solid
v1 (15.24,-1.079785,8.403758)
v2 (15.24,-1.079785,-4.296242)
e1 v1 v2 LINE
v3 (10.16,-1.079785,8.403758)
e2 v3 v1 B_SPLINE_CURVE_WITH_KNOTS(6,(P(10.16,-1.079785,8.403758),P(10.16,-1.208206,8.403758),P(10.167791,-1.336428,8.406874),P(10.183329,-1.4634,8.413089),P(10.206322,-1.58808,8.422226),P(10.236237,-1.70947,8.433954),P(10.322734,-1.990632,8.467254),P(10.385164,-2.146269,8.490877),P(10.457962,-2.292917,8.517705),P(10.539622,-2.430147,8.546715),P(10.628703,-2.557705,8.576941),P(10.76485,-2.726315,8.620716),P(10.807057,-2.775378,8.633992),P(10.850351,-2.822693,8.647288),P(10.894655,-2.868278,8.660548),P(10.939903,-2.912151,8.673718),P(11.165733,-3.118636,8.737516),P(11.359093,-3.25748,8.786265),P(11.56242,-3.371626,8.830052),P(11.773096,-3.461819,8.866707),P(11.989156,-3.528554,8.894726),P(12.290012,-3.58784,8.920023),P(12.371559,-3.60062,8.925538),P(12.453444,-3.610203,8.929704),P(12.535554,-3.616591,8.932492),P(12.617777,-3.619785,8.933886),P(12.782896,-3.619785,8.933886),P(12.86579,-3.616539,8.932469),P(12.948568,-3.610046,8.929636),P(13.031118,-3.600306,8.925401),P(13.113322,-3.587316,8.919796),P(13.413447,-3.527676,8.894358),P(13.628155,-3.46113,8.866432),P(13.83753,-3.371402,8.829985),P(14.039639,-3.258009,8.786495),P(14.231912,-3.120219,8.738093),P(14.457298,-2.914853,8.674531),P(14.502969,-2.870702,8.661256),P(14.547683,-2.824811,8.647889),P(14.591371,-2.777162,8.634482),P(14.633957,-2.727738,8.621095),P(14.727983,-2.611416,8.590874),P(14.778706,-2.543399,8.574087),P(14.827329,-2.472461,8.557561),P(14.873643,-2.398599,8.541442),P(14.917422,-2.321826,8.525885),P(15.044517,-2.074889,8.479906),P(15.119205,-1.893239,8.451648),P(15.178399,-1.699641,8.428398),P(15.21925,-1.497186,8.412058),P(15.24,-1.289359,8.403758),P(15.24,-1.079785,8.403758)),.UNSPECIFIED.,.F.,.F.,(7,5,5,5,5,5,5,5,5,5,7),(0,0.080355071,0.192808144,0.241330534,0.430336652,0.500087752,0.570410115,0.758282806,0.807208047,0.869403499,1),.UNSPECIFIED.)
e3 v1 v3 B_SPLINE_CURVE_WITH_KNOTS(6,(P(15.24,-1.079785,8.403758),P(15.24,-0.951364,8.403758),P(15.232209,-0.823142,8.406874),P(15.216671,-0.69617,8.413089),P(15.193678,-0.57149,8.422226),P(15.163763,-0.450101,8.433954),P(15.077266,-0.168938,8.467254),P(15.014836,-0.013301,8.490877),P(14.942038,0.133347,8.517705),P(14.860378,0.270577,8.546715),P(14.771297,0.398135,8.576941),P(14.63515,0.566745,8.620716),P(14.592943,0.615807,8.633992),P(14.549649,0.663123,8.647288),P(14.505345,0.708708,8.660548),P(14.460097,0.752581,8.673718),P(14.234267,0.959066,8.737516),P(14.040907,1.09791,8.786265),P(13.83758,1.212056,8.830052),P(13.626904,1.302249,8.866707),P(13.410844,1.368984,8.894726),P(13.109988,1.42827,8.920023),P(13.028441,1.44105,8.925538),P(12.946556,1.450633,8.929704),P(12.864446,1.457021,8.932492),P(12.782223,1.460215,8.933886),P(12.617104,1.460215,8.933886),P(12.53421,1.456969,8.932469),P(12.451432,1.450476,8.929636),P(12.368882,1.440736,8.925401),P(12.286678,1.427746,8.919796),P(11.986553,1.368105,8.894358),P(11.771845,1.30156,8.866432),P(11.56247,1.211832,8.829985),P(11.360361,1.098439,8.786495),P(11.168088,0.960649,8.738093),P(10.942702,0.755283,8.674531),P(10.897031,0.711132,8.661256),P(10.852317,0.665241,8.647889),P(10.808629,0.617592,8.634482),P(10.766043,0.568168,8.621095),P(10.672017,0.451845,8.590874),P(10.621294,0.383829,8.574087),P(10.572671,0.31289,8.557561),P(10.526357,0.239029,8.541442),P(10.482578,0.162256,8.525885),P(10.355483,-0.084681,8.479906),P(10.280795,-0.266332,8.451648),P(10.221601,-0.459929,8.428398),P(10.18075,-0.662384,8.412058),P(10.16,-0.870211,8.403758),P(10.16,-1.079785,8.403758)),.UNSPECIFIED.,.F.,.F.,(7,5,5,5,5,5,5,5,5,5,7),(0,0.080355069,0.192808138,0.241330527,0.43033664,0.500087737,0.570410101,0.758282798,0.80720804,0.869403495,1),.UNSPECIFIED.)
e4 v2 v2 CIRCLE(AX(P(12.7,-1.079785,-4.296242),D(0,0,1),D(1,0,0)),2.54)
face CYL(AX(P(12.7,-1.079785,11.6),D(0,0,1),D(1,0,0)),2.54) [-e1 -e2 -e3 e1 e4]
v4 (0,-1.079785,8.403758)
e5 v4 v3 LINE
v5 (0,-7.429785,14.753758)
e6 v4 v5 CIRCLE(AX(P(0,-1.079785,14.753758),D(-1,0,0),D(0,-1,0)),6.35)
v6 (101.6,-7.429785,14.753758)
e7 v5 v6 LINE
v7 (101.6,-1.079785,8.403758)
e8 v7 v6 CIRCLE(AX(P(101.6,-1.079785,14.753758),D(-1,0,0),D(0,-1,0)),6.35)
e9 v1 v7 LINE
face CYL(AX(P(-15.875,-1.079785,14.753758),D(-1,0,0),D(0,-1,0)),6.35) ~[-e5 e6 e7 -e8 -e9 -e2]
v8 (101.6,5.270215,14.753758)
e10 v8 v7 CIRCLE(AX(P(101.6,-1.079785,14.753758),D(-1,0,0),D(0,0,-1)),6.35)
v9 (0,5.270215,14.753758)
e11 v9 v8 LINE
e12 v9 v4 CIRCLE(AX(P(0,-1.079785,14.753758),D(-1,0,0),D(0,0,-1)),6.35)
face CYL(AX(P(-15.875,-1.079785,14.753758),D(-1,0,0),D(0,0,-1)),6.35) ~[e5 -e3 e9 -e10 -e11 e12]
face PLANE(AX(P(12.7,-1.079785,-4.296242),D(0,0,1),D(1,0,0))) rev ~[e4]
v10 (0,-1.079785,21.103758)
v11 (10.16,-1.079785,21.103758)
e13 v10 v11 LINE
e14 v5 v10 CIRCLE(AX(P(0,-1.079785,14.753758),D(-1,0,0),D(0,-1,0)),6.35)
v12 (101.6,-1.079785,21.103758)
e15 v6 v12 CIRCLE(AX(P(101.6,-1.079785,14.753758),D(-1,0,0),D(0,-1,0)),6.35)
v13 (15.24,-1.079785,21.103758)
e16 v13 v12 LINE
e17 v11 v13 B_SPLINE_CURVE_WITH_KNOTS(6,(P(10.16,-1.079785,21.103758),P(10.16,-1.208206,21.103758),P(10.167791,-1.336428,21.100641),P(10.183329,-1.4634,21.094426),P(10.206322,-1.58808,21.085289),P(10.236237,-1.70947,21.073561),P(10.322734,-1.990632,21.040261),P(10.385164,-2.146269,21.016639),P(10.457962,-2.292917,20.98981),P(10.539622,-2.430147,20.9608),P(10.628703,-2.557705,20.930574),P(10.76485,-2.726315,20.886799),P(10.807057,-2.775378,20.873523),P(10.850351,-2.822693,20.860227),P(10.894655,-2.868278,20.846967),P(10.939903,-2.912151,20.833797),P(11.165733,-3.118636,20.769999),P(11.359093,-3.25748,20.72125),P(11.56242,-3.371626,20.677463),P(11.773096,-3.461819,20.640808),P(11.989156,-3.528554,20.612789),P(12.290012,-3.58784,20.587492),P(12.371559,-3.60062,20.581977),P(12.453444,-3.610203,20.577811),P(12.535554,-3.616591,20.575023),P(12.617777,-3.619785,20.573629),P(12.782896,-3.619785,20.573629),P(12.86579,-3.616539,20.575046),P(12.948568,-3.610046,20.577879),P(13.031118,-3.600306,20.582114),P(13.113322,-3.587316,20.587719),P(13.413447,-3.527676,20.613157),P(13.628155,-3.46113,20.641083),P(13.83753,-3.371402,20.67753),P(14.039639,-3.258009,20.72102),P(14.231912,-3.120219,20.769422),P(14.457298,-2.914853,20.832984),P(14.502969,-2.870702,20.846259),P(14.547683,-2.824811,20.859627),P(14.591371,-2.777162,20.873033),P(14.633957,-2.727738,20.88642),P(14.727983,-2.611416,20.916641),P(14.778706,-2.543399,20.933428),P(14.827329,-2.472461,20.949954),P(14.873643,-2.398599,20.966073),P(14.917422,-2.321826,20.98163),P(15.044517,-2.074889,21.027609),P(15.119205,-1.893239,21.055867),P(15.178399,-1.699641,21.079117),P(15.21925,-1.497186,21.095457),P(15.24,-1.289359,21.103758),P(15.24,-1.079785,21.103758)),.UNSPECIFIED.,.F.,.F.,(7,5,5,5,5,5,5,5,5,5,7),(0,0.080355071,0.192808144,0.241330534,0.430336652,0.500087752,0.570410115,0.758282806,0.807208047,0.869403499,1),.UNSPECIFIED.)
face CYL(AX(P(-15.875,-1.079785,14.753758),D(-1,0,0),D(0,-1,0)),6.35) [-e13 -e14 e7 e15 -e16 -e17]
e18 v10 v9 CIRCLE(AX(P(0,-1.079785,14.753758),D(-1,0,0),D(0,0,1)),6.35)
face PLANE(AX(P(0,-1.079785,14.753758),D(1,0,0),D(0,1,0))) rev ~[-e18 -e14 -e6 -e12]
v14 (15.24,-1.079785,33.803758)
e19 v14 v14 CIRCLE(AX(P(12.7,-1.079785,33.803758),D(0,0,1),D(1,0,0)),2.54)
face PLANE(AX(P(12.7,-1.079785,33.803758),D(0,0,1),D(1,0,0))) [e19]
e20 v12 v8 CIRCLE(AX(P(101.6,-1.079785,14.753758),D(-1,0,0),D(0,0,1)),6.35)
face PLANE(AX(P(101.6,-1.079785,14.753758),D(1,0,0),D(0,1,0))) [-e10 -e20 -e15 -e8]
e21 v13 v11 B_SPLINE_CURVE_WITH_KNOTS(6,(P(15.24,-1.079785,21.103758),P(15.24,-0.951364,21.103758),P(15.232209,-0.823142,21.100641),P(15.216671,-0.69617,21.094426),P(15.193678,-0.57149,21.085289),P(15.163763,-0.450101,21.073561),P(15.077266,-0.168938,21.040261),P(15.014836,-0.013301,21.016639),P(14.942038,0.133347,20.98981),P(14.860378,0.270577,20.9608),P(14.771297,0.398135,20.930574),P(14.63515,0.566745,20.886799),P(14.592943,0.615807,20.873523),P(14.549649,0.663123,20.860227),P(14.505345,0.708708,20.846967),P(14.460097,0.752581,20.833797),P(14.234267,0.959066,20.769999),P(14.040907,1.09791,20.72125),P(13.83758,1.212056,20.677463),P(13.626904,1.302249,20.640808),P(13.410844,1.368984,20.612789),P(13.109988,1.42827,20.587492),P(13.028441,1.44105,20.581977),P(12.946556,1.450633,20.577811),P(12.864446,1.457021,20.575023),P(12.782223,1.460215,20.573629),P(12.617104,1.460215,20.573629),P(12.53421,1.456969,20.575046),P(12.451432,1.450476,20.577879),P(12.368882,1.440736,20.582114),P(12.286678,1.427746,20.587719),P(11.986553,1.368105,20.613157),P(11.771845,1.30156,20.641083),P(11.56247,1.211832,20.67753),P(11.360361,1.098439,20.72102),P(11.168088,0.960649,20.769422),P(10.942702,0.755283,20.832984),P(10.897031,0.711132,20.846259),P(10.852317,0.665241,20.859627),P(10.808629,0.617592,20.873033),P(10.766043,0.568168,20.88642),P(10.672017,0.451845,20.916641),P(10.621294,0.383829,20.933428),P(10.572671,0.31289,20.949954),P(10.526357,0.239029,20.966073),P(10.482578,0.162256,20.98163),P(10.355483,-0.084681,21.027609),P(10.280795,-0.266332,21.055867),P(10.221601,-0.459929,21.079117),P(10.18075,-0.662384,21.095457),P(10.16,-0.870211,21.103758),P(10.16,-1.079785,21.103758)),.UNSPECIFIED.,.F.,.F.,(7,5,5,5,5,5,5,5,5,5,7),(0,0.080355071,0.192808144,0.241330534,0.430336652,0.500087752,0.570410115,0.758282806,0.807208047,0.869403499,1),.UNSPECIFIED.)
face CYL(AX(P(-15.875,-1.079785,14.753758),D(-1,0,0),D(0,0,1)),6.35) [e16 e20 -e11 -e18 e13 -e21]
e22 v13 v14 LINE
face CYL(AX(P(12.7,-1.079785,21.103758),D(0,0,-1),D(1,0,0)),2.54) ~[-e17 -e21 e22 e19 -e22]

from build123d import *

# Parameters (mm, degrees)
F0_W         = 12.7
F0_H         = 12.7
F1_DEPTH     = 101.6
F2_R         = 2.54
F3_DEPTH     = 25.4
F4_DEPTH     = 12.7
F5_T4_DEPTH  = 133.35
F5_S5_R      = 2.54
F5_T6_DEPTH  = 68
F5_T10_DEPTH = 133.35
F5_S11_R     = 2.54
F5_T12_DEPTH = 68
F5_T16_DEPTH = 133.35
F5_S17_R     = 2.54
F5_T18_DEPTH = 68
F5_T22_DEPTH = 133.35
F5_S23_R     = 2.54
F5_T24_DEPTH = 68


# Not quite as in the source:
# - a fillet or chamfer that OpenCascade refuses, or shapes differently, is made with other operations: its cross-section is extruded or revolved along the edge and cut away or added


with BuildPart() as f1:
    # F0 (on Right) → F1 (new body)
    with BuildSketch(Plane.YZ):
        with Locations((-1.0797850298, 14.7537575103)):
            Rectangle(F0_W, F0_H)
    extrude(amount=F1_DEPTH)

    # F2 (on face) → F3 (join)
    with BuildSketch(Plane.XY.offset(21.1037575103)):
        with Locations((12.7, -1.0797850298)):
            Circle(F2_R)
    extrude(amount=-F3_DEPTH)

    # F2 (on face) → F4 (join)
    with BuildSketch(Plane.XY.offset(21.1037575103)):
        with Locations((12.7, -1.0797850298)):
            Circle(F2_R)
    extrude(amount=F4_DEPTH)

    # F5: fillet of radius 6.35 on 4 edges, made by hand


with BuildPart() as f5_tool2:
    # F5_s3 → F5_t4 (new body)
    with BuildSketch(Plane.YZ.offset(-15.875)):
        with BuildLine():
            ThreePointArc((-7.4297850298, 14.7537575103), (-5.5699130903, 19.2438855709), (-1.0797850298, 21.1037575103))
            Line((-1.0797850298, 21.1037575103), (-7.4297850298, 21.1037575103))
            Line((-7.4297850298, 21.1037575103), (-7.4297850298, 14.7537575103))
        make_face()
    extrude(amount=F5_T4_DEPTH)

    # F5_s5 → F5_t6 (cut, symmetric)
    with BuildSketch(Plane.XY.offset(17.9)):
        with Locations((12.7, -1.0797850298)):
            Circle(F5_S5_R)
    extrude(amount=F5_T6_DEPTH, both=True, mode=Mode.SUBTRACT)


with BuildPart() as f1_1:
    add(f1.part)

    # F5_t1: cut F5_tool2
    add(f5_tool2.part, mode=Mode.SUBTRACT)


with BuildPart() as f5_tool8:
    # F5_s9 → F5_t10 (new body)
    with BuildSketch(Plane.YZ.offset(-15.875)):
        with BuildLine():
            ThreePointArc((-1.0797850298, 21.1037575103), (3.4103430308, 19.2438855709), (5.2702149702, 14.7537575103))
            Line((5.2702149702, 14.7537575103), (5.2702149702, 21.1037575103))
            Line((5.2702149702, 21.1037575103), (-1.0797850298, 21.1037575103))
        make_face()
    extrude(amount=F5_T10_DEPTH)

    # F5_s11 → F5_t12 (cut, symmetric)
    with BuildSketch(Plane.XY.offset(17.9)):
        with Locations((12.7, -1.0797850298)):
            Circle(F5_S11_R)
    extrude(amount=F5_T12_DEPTH, both=True, mode=Mode.SUBTRACT)


with BuildPart() as f1_2:
    add(f1_1.part)

    # F5_t7: cut F5_tool8
    add(f5_tool8.part, mode=Mode.SUBTRACT)


with BuildPart() as f5_tool14:
    # F5_s15 → F5_t16 (new body)
    with BuildSketch(Plane.YZ.offset(-15.875)):
        with BuildLine():
            ThreePointArc((-7.4297850298, 14.7537575103), (-5.5699130903, 10.2636294498), (-1.0797850298, 8.4037575103))
            Line((-1.0797850298, 8.4037575103), (-7.4297850298, 8.4037575103))
            Line((-7.4297850298, 8.4037575103), (-7.4297850298, 14.7537575103))
        make_face()
    extrude(amount=F5_T16_DEPTH)

    # F5_s17 → F5_t18 (cut, symmetric)
    with BuildSketch(Plane.XY.offset(11.6)):
        with Locations((12.7, -1.0797850298)):
            Circle(F5_S17_R)
    extrude(amount=F5_T18_DEPTH, both=True, mode=Mode.SUBTRACT)


with BuildPart() as f1_3:
    add(f1_2.part)

    # F5_t13: cut F5_tool14
    add(f5_tool14.part, mode=Mode.SUBTRACT)


with BuildPart() as f5_tool20:
    # F5_s21 → F5_t22 (new body)
    with BuildSketch(Plane.YZ.offset(-15.875)):
        with BuildLine():
            ThreePointArc((-1.0797850298, 8.4037575103), (3.4103430308, 10.2636294498), (5.2702149702, 14.7537575103))
            Line((5.2702149702, 14.7537575103), (5.2702149702, 8.4037575103))
            Line((5.2702149702, 8.4037575103), (-1.0797850298, 8.4037575103))
        make_face()
    extrude(amount=F5_T22_DEPTH)

    # F5_s23 → F5_t24 (cut, symmetric)
    with BuildSketch(Plane.XY.offset(11.6)):
        with Locations((12.7, -1.0797850298)):
            Circle(F5_S23_R)
    extrude(amount=F5_T24_DEPTH, both=True, mode=Mode.SUBTRACT)


with BuildPart() as f1_4:
    add(f1_3.part)

    # F5_t19: cut F5_tool20
    add(f5_tool20.part, mode=Mode.SUBTRACT)


solid = f1_4.part
